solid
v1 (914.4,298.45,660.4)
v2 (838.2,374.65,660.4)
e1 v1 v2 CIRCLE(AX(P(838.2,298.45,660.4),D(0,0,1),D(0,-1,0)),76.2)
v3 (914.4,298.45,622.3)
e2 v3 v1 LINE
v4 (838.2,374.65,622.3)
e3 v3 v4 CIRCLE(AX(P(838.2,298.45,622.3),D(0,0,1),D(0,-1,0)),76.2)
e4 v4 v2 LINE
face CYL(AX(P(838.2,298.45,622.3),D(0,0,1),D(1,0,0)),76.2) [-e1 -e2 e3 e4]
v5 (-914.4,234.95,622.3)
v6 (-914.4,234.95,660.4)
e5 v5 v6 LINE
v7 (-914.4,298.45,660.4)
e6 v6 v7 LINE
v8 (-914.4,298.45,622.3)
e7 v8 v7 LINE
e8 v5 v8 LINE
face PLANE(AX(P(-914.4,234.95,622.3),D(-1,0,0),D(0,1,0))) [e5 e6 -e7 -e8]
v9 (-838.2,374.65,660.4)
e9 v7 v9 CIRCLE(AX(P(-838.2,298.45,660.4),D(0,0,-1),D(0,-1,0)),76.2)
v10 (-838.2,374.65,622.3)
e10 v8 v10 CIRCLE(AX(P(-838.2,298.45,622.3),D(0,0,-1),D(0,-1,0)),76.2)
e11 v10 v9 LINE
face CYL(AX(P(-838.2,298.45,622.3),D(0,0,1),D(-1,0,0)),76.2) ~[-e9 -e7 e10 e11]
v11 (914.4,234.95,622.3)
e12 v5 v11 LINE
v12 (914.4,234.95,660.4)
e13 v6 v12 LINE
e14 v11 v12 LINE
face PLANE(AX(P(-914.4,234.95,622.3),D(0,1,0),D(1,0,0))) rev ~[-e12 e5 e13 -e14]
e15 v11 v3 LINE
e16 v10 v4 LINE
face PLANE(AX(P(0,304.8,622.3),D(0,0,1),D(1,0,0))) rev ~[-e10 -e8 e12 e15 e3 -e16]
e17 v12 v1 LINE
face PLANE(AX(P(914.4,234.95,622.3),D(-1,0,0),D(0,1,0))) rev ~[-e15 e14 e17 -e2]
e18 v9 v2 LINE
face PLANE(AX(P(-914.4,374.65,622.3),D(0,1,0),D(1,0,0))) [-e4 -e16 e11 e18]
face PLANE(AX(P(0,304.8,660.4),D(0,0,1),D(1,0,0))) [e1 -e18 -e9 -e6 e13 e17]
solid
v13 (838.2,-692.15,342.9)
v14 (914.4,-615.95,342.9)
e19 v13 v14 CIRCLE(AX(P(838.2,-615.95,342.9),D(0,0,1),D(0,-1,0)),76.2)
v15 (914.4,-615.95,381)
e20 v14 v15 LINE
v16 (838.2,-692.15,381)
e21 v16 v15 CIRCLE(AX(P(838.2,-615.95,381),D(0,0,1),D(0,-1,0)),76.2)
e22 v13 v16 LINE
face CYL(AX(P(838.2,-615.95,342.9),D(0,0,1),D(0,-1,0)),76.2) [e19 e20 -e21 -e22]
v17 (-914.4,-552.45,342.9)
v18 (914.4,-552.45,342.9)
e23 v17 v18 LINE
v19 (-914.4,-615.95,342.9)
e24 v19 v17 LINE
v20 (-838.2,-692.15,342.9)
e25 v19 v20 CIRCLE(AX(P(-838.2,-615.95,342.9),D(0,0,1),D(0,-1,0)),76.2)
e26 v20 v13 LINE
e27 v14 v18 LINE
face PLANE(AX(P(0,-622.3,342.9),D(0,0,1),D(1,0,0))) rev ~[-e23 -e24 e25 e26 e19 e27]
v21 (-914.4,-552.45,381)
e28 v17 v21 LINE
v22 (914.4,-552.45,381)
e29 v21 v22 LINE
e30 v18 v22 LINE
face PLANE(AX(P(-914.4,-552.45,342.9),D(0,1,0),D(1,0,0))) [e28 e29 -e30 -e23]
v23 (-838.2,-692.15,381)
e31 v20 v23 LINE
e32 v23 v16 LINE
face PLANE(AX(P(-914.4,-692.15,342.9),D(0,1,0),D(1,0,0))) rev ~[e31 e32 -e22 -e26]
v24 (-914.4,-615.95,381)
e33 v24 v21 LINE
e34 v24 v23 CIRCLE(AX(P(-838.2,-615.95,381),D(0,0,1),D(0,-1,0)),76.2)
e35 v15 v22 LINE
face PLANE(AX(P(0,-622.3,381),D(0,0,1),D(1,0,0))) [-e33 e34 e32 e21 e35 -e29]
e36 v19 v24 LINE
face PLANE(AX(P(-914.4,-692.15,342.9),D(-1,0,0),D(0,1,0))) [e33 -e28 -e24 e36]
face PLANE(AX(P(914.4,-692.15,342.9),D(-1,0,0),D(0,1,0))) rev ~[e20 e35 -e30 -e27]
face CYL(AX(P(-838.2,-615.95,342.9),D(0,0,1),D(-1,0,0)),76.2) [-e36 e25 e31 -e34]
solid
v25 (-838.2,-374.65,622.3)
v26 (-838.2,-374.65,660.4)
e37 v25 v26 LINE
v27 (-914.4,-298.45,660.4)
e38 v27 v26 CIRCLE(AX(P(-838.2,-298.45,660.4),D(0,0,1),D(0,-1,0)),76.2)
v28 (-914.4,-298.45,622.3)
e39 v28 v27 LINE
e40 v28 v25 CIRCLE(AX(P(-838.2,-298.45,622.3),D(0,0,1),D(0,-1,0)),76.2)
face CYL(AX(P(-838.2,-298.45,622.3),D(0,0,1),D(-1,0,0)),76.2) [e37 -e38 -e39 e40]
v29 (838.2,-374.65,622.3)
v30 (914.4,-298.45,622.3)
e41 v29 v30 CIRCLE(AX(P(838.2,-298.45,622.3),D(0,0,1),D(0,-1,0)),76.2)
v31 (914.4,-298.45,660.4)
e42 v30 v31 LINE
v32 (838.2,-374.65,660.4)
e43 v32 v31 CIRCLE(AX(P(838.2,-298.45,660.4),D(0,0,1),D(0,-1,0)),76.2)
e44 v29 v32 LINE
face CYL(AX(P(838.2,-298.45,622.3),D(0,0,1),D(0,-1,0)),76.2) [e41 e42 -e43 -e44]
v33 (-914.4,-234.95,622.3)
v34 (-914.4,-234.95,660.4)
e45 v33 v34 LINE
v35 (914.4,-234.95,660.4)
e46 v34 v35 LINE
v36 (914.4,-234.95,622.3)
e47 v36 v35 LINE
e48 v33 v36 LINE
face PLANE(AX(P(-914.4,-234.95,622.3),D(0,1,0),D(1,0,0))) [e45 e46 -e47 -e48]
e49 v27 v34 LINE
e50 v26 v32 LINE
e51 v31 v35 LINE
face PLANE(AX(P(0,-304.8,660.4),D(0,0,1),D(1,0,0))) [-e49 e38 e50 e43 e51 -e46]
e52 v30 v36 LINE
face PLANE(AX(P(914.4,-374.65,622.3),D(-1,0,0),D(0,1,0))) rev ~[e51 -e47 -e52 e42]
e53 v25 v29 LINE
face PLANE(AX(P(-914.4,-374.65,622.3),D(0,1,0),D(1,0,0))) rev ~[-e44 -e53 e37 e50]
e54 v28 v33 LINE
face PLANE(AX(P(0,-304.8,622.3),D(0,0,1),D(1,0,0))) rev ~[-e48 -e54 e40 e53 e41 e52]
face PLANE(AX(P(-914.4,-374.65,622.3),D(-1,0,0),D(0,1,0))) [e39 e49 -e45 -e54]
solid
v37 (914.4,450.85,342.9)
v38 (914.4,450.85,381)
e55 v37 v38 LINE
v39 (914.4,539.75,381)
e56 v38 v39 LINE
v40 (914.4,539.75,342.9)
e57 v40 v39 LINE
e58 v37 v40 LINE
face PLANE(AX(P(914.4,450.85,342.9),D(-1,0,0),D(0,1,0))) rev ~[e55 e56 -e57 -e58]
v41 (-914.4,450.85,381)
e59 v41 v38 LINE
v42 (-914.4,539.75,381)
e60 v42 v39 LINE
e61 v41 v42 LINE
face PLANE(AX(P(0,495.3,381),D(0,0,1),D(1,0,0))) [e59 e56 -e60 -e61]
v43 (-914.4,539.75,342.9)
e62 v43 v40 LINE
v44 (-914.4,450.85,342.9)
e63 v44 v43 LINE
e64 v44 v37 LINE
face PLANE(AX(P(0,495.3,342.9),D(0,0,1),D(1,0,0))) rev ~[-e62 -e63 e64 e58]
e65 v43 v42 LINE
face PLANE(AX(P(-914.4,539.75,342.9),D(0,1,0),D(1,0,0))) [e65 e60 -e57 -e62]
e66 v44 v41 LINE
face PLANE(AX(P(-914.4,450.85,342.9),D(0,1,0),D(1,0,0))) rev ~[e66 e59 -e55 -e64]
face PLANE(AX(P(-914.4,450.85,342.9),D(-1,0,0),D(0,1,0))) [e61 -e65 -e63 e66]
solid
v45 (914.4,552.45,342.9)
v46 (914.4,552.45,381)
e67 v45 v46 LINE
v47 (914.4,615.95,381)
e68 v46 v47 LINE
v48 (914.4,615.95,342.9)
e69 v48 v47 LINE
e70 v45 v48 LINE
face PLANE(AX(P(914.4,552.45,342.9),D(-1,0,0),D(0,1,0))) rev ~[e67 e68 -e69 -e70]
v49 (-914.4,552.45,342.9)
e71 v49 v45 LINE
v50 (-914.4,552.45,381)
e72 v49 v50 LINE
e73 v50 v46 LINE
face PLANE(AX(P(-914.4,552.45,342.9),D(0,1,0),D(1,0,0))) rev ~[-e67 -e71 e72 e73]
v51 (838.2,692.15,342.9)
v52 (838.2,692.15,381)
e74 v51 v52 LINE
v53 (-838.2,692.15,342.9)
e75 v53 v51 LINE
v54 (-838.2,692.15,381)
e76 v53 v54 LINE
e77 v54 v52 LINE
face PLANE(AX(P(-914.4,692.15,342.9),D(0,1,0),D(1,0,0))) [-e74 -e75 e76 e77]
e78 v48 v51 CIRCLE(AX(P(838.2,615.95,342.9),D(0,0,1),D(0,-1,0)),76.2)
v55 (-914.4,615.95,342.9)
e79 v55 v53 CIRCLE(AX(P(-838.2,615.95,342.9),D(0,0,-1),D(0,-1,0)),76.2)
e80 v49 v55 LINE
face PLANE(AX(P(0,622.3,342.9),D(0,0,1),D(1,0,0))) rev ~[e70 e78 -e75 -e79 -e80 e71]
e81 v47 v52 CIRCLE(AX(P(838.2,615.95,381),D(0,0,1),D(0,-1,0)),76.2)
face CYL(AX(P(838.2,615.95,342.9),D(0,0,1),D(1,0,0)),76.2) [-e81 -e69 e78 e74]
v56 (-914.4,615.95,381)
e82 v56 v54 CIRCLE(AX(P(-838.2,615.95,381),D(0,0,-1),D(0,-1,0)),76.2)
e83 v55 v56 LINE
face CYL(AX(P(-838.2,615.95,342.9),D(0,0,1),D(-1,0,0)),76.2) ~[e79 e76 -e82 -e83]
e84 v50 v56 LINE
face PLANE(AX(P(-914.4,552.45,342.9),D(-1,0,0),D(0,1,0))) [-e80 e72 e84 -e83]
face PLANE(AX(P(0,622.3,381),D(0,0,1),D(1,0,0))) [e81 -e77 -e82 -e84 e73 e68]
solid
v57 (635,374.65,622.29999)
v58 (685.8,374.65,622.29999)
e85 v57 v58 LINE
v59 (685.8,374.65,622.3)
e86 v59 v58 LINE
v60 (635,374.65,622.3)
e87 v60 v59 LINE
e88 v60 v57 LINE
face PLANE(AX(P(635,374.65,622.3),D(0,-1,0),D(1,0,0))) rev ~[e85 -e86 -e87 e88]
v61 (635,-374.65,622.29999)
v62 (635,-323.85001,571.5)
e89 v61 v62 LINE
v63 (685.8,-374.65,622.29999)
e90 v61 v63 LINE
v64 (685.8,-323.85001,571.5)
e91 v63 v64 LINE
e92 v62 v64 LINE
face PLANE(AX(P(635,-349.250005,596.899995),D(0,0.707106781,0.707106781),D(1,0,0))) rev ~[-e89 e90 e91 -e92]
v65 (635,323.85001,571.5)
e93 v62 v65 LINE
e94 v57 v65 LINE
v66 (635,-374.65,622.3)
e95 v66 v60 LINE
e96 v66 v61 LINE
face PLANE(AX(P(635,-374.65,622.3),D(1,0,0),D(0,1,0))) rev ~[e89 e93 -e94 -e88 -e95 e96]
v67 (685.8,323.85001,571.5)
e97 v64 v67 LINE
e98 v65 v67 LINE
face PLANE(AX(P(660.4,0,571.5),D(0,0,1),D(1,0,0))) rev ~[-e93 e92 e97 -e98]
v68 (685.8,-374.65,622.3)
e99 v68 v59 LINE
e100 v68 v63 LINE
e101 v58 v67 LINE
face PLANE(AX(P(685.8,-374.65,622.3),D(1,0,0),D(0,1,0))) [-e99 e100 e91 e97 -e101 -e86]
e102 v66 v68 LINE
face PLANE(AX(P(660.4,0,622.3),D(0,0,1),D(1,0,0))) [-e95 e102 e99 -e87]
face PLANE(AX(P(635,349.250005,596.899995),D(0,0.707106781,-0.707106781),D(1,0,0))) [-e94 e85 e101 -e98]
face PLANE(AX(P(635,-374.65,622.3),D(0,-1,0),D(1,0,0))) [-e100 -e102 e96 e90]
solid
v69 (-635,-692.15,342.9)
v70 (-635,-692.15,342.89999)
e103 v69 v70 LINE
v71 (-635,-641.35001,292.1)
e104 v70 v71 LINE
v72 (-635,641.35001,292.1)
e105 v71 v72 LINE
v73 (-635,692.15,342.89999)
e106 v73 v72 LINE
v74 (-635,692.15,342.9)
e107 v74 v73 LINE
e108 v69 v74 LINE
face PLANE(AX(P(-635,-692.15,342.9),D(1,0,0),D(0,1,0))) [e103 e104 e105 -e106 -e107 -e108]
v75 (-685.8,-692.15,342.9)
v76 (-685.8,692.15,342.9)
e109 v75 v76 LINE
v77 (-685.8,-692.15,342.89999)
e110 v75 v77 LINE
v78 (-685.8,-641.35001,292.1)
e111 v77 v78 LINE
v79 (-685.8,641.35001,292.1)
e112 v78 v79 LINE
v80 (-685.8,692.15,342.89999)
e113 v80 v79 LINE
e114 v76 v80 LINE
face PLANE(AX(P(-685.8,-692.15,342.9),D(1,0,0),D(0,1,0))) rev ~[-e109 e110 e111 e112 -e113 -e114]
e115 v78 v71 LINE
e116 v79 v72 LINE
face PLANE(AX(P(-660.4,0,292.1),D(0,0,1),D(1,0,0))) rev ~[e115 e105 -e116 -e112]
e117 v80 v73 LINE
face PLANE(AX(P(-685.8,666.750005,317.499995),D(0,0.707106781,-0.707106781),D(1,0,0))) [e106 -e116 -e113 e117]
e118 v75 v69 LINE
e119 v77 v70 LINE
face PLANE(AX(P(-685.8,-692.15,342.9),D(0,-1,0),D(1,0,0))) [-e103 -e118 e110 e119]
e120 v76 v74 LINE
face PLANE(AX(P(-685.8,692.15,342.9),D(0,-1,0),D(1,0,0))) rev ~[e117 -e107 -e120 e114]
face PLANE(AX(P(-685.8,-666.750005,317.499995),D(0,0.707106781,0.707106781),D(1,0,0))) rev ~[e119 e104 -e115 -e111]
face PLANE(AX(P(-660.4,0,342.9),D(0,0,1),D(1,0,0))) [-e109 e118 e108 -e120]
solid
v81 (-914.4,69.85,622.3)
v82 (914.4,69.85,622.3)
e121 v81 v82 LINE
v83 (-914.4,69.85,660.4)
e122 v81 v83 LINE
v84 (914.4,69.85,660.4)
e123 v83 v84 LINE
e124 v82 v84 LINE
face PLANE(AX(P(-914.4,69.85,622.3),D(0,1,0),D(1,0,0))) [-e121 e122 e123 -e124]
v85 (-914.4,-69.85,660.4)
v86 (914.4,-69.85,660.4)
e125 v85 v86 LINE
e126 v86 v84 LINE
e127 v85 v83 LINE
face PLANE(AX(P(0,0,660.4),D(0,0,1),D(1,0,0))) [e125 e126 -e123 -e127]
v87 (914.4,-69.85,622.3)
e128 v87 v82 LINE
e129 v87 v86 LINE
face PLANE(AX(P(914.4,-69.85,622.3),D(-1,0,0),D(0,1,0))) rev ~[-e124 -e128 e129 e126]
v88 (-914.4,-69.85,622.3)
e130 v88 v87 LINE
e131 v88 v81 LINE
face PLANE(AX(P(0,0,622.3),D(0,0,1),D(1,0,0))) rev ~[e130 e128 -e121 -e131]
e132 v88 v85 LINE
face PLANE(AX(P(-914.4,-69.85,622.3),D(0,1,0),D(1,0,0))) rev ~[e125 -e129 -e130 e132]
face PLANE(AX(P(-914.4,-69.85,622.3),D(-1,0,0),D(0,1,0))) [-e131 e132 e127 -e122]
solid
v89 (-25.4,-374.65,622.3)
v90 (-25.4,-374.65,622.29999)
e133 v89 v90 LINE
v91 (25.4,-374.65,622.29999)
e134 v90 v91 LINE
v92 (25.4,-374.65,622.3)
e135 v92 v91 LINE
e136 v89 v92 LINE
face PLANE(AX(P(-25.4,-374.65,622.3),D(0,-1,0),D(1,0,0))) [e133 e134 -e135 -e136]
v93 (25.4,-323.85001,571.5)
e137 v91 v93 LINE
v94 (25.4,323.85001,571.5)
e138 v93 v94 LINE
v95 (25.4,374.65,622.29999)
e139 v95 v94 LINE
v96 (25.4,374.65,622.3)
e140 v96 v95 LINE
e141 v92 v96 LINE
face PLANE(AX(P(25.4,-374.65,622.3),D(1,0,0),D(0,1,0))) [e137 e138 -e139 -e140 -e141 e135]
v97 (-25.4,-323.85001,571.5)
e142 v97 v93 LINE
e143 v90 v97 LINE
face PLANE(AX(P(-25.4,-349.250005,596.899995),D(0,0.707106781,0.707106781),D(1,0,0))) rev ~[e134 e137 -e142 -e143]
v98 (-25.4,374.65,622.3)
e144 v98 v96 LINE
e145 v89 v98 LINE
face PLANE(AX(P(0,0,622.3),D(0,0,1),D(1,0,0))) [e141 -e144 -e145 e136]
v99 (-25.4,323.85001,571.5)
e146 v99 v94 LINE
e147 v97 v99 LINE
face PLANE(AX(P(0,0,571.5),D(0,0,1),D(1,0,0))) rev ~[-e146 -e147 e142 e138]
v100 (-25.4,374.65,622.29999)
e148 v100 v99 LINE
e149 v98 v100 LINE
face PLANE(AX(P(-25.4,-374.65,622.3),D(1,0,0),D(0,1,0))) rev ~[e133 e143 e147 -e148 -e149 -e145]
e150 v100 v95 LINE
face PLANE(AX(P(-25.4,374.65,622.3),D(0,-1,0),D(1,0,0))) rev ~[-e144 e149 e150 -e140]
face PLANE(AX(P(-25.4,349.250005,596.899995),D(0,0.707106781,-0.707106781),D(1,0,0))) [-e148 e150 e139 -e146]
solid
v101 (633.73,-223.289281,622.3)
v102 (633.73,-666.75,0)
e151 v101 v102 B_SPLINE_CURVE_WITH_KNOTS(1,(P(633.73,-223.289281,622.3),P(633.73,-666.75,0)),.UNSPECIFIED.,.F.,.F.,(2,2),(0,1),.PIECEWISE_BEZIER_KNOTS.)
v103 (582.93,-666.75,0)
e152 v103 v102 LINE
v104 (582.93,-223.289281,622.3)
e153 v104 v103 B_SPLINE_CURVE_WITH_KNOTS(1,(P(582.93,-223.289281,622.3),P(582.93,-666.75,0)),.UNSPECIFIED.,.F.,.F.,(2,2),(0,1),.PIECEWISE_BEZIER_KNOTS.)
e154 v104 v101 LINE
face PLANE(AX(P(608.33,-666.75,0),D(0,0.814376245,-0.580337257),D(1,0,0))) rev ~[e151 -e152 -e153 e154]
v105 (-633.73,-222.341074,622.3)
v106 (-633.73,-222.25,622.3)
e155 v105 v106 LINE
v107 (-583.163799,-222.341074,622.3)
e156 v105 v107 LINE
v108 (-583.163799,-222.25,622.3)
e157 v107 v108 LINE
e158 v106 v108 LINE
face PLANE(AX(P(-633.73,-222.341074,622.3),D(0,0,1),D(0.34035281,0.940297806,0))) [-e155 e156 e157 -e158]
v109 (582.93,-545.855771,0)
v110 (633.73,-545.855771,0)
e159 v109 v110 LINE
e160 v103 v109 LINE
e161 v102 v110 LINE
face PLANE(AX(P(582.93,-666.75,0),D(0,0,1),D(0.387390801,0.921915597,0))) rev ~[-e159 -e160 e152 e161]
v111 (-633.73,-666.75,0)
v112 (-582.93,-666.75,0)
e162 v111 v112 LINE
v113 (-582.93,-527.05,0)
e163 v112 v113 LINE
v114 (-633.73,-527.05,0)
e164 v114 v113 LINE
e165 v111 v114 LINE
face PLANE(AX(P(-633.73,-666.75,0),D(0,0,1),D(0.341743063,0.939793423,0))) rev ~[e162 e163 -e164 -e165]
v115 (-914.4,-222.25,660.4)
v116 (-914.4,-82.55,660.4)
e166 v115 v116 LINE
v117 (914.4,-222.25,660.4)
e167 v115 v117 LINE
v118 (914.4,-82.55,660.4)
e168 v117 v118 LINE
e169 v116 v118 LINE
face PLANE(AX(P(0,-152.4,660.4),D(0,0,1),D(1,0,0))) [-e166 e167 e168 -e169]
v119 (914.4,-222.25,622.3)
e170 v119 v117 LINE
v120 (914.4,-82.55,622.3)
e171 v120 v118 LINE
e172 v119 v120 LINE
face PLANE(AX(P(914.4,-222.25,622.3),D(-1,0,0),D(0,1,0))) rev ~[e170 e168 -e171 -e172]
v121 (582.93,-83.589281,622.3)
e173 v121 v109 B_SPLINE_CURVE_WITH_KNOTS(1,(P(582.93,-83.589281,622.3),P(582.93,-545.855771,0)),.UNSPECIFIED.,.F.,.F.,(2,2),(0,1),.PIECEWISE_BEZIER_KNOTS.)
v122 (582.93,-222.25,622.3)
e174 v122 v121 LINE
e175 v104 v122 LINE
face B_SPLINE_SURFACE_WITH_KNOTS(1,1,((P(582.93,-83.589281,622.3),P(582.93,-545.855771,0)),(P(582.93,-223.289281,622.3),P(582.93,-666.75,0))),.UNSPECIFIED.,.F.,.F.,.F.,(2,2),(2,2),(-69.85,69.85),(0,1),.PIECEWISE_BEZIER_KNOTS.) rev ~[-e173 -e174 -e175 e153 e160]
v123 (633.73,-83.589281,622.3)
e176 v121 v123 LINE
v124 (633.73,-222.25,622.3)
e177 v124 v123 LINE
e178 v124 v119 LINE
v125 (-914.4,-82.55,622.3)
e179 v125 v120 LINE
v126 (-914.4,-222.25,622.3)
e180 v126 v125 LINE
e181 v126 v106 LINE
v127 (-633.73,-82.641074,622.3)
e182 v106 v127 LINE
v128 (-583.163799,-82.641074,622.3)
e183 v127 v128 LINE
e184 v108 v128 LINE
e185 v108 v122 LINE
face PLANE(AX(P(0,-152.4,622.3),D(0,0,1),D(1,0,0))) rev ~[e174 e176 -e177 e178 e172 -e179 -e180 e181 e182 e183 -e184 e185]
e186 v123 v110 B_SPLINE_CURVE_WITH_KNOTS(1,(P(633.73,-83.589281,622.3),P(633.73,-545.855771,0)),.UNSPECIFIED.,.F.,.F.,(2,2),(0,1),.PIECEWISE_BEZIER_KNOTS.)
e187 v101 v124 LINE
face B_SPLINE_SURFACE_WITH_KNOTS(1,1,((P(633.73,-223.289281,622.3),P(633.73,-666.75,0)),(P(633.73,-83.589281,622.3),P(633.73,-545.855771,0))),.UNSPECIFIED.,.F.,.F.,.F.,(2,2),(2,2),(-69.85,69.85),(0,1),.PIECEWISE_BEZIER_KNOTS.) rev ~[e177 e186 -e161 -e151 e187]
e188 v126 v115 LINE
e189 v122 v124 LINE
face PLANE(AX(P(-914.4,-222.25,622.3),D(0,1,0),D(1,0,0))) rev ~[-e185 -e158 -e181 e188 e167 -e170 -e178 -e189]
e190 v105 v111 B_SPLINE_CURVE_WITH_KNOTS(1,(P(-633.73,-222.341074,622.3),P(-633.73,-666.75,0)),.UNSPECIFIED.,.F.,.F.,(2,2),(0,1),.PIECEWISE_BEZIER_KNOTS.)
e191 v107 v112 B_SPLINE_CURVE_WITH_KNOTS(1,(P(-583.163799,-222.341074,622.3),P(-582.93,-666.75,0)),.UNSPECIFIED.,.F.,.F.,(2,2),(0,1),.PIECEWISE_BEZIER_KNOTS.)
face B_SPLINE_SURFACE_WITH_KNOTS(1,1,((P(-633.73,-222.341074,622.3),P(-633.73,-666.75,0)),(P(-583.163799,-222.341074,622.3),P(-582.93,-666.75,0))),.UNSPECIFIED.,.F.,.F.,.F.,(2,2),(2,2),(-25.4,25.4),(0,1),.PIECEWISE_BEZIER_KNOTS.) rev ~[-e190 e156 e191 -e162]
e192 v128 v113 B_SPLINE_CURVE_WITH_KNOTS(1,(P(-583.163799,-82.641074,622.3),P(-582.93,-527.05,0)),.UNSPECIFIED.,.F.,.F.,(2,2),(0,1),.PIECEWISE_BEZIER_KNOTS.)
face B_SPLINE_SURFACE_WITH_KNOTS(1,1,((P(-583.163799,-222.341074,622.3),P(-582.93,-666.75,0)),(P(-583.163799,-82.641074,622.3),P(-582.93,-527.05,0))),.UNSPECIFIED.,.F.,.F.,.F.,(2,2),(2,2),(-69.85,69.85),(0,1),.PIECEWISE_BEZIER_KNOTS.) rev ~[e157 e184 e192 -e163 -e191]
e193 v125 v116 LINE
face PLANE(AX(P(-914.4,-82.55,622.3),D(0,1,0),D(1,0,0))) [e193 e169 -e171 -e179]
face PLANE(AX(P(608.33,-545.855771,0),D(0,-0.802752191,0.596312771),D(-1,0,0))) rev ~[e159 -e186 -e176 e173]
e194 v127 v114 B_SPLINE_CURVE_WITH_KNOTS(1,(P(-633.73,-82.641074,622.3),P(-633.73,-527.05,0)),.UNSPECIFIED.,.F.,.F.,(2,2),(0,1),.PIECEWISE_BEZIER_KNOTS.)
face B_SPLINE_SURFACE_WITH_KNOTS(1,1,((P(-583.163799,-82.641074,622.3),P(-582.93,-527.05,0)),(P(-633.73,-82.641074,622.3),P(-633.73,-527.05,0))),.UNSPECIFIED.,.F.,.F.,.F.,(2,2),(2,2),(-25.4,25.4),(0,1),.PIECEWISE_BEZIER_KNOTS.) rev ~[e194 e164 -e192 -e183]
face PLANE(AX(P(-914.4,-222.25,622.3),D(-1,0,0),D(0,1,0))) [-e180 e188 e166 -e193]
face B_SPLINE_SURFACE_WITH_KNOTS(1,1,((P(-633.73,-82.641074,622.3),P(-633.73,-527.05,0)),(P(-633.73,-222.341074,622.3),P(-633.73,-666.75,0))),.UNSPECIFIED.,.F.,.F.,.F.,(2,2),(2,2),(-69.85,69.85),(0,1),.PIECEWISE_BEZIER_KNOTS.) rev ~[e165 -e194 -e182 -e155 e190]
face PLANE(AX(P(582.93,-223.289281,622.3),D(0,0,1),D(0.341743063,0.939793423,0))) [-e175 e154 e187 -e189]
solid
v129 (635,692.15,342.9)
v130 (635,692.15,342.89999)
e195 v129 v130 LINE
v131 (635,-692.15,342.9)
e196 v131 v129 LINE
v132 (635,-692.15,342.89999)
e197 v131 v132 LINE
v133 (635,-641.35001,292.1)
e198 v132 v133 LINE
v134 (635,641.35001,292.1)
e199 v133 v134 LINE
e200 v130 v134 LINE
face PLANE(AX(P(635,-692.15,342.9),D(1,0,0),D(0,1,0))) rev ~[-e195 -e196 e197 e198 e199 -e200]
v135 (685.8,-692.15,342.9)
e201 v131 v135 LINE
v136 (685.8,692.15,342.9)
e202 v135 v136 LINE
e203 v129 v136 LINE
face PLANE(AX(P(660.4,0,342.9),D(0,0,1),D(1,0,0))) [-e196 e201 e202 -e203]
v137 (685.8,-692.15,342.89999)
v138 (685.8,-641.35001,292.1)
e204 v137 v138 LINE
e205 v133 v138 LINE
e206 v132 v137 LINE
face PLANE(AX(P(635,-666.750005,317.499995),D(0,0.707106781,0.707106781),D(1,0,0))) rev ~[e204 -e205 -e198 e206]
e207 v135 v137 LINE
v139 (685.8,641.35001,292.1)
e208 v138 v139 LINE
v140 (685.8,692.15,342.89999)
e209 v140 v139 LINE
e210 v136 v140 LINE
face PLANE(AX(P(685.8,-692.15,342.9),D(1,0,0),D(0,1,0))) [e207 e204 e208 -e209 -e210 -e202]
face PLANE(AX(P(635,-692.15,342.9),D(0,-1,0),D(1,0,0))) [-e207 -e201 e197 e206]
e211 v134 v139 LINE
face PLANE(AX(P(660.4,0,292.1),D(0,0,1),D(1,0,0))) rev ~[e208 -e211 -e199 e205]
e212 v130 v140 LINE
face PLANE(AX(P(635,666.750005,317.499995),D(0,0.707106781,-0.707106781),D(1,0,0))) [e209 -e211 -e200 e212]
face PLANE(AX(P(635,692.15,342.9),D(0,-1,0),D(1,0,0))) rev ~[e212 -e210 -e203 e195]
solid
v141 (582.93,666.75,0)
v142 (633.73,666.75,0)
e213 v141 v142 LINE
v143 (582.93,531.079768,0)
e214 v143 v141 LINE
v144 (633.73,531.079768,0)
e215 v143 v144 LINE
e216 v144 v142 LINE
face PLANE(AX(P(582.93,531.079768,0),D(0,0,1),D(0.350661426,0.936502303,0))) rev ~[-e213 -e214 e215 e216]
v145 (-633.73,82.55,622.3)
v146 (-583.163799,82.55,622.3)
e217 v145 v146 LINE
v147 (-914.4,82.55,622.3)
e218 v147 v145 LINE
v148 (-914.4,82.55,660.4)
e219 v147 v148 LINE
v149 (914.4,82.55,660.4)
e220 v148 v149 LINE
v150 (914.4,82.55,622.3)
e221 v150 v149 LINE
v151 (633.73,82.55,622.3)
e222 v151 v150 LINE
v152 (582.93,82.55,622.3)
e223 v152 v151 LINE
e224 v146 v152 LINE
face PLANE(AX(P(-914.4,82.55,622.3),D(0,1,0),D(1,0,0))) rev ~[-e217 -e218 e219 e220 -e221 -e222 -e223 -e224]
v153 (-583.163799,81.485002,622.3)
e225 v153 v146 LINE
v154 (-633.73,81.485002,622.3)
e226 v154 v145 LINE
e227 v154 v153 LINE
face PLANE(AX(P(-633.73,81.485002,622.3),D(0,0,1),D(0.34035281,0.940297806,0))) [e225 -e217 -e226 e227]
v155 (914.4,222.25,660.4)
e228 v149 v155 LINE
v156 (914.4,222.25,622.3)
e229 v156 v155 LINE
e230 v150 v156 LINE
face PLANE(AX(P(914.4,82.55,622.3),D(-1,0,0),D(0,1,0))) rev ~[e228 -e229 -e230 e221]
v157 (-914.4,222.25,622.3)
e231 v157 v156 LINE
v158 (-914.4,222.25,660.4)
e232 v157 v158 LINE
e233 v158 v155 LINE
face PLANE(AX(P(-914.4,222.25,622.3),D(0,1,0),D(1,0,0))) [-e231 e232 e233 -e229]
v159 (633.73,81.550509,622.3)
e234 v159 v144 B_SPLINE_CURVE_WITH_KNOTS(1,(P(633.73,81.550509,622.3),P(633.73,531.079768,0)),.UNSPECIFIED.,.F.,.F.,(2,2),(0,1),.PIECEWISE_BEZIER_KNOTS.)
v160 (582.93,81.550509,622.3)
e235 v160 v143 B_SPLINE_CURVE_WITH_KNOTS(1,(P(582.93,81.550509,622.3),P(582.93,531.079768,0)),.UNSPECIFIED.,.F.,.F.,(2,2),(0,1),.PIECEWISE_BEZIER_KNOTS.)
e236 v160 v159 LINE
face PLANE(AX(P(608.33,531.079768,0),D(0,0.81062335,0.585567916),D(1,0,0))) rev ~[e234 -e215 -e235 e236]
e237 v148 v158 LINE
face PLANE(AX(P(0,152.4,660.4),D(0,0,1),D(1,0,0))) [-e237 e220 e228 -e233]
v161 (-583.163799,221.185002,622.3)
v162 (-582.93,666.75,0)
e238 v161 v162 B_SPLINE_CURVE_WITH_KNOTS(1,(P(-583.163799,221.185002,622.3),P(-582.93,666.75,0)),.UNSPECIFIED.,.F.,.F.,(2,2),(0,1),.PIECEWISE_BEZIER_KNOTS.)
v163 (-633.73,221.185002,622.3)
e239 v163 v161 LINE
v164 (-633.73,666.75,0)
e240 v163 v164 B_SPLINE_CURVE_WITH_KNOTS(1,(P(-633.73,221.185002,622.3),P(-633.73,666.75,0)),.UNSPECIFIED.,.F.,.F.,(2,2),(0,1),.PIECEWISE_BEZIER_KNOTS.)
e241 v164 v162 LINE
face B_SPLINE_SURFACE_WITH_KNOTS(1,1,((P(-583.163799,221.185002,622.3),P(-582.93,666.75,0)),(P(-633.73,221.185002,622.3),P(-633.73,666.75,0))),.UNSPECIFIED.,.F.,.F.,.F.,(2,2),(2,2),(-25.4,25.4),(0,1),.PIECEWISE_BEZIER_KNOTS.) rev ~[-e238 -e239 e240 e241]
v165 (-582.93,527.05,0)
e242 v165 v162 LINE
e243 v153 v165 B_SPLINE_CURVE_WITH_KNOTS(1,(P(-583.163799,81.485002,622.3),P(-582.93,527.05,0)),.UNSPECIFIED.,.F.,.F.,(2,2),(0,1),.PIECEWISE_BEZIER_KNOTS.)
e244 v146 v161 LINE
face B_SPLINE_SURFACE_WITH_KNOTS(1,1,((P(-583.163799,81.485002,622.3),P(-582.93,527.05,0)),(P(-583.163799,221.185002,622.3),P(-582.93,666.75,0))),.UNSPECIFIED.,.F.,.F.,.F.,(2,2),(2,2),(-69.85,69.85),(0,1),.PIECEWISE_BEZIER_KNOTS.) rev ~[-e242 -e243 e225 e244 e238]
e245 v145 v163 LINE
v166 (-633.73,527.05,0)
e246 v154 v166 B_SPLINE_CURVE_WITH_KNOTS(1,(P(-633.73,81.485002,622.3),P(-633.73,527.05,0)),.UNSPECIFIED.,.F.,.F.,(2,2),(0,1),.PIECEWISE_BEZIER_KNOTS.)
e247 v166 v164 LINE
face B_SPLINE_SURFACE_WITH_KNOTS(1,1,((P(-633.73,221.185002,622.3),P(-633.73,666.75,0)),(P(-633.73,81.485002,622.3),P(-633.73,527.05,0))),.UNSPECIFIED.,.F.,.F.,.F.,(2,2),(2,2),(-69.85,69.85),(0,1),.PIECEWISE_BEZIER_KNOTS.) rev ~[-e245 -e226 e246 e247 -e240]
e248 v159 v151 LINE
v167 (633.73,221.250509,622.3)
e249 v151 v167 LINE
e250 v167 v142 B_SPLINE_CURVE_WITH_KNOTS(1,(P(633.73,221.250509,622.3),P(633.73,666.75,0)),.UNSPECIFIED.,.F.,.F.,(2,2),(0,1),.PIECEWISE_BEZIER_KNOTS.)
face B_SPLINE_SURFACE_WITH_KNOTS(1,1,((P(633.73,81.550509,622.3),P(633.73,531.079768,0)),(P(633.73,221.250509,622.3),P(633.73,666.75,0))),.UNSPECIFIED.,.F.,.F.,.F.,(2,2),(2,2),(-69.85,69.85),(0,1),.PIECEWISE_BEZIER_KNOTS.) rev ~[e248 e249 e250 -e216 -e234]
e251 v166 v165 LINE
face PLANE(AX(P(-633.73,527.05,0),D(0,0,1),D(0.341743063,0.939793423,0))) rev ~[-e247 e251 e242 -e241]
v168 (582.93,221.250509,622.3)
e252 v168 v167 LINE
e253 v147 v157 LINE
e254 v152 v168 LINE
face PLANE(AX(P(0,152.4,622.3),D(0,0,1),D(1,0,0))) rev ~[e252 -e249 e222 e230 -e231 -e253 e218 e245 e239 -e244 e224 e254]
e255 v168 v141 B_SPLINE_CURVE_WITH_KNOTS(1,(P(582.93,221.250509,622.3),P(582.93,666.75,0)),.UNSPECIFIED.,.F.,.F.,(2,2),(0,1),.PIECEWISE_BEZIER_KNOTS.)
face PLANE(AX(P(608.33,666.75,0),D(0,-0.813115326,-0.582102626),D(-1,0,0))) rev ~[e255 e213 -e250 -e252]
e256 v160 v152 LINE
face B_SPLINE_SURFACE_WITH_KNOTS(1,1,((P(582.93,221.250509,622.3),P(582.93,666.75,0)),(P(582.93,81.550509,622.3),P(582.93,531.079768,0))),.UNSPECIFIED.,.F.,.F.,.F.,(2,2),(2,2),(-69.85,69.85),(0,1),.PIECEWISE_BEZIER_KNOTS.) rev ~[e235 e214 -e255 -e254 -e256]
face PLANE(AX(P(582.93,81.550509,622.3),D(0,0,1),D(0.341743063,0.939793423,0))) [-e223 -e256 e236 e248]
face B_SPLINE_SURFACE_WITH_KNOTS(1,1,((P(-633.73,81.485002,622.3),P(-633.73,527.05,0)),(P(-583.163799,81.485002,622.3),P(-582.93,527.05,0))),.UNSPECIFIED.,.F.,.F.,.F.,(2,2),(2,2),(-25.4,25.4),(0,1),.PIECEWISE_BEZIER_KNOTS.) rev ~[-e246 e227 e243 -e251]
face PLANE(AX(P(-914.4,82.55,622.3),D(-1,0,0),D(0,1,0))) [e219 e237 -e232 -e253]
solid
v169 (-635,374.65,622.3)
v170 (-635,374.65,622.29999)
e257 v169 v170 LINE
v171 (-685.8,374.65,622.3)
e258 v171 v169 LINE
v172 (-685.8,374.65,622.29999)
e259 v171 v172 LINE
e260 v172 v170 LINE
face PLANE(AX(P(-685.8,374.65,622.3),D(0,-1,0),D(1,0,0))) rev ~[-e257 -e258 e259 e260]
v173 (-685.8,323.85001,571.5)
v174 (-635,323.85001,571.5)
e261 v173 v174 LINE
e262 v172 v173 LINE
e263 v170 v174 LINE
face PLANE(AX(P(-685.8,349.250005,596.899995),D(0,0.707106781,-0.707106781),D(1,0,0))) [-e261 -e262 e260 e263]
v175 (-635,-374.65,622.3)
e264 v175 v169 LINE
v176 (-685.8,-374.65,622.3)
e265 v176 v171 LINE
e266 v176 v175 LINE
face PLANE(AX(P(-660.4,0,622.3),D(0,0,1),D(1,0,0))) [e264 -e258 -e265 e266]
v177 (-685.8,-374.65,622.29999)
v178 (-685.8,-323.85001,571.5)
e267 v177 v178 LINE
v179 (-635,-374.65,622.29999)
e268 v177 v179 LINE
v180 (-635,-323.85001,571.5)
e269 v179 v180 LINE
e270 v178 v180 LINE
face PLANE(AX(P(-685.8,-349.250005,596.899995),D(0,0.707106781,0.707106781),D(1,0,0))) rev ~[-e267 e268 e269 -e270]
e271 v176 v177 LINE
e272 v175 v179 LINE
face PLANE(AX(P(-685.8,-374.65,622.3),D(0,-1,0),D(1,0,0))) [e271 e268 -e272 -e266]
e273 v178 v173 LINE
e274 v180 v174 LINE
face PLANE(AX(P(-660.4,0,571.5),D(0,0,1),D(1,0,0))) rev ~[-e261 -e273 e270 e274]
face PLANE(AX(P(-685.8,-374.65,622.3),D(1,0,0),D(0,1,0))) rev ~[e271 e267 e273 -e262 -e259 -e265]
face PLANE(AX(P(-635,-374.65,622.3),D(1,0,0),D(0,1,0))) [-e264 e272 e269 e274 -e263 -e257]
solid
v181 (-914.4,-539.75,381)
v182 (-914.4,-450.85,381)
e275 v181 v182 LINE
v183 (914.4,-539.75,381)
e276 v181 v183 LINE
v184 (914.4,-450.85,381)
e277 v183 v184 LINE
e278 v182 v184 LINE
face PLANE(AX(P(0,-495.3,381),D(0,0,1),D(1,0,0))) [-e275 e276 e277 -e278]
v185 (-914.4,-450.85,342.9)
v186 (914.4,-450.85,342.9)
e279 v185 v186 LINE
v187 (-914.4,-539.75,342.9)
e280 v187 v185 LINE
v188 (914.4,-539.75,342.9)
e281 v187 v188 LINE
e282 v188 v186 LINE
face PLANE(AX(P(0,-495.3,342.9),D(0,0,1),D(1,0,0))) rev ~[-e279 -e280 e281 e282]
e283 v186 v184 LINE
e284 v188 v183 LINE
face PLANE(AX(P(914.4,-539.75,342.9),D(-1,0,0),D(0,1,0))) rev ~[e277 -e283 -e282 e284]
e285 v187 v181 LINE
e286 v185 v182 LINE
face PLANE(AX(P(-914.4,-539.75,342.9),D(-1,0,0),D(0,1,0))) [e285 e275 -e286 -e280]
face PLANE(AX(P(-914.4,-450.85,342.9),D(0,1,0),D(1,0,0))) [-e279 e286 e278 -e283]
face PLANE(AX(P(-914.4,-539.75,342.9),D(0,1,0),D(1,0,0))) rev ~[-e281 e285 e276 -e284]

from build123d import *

# Parameters (mm, degrees)
F3_W       = 1828.8
F3_H       = 139.7
F4_DEPTH   = 38.1
F2_W       = 1828.8
F2_H       = 139.7
F5_R       = 76.2
F5_2_R     = 76.2
F6_W       = 1828.8
F6_H       = 88.9
F7_DEPTH   = 38.1
F6_H_2     = 139.7
F8_R       = 76.2
F8_2_R     = 76.2
F9_W       = 50.8
F9_H       = 749.3
F10_DEPTH  = 50.8
F12_SIZE   = 50.79999
F12_2_SIZE = 50.79999
F12_3_SIZE = 50.79999
F11_W      = 50.8
F11_H      = 1384.3
F13_DEPTH  = 50.8
F14_SIZE   = 50.79999
F14_2_SIZE = 50.79999
F15_W      = 50.8
F15_H      = 139.7
F16_W      = 50.8
F16_H      = 135.6702318695
F15_W_2    = 50.5662006634
F16_H_2    = 139.7
F16_H_3    = 120.8942294282


# Not quite as in the source:
# - a fillet or chamfer is up to 0.001 mm smaller than in the source, because OpenCascade refuses the exact size


with BuildPart() as f4:
    # F3 (on offset) → F4 (new body)
    with BuildSketch(Plane.XY.offset(622.3)):
        with Locations((0, 304.8)):
            Rectangle(F3_W, F3_H)
    extrude(amount=F4_DEPTH)

    # F5#2
    f5_2_edges = [f4.edges().sort_by_distance(p)[0] for p in [
        (914.4, 374.65, 641.35),
        (-914.4, 374.65, 641.35),
    ]]
    fillet(f5_2_edges, radius=F5_2_R)


with BuildPart() as f4b:
    # F3 (on offset) → F4, piece 2 (new body)
    with BuildSketch(Plane.XY.offset(622.3)):
        with Locations((0, 152.4)):
            Rectangle(F3_W, F3_H)
    extrude(amount=F4_DEPTH)

    # F15 (on offset) → F17 section 0
    with BuildSketch(Plane.XY.offset(622.3)):
        with Locations((608.33, 151.4005087376)):
            Rectangle(F15_W, F15_H)
    # F16 (on Top) → F17 section 1
    with BuildSketch(Plane.XY):
        with Locations((608.33, 598.9148840653)):
            Rectangle(F16_W, F16_H)
    loft()

    # F15 (on offset) → F18 section 0
    with BuildSketch(Plane.XY.offset(622.3)):
        with Locations((-608.4468996683, 151.3350016614)):
            Rectangle(F15_W_2, F15_H)
    # F16 (on Top) → F18 section 1
    with BuildSketch(Plane.XY):
        with Locations((-608.33, 596.9)):
            Rectangle(F16_W, F16_H_2)
    loft()


with BuildPart() as f4c:
    # F3 (on offset) → F4, piece 3 (new body)
    with BuildSketch(Plane.XY.offset(622.3)):
        with Locations((0, -152.4)):
            Rectangle(F3_W, F3_H)
    extrude(amount=F4_DEPTH)

    # F15 (on offset) → F19 section 0
    with BuildSketch(Plane.XY.offset(622.3)):
        with Locations((608.33, -153.4392811298)):
            Rectangle(F15_W, F15_H)
    # F16 (on Top) → F19 section 1
    with BuildSketch(Plane.XY):
        with Locations((608.33, -606.3028852859)):
            Rectangle(F16_W, F16_H_3)
    loft()

    # F15 (on offset) → F20 section 0
    with BuildSketch(Plane.XY.offset(622.3)):
        with Locations((-608.4468996683, -152.4910742103)):
            Rectangle(F15_W_2, F15_H)
    # F16 (on Top) → F20 section 1
    with BuildSketch(Plane.XY):
        with Locations((-608.33, -596.9)):
            Rectangle(F16_W, F16_H_2)
    loft()


with BuildPart() as f4d:
    # F3 (on offset) → F4, piece 4 (new body)
    with BuildSketch(Plane.XY.offset(622.3)):
        with Locations((0, -304.8)):
            Rectangle(F3_W, F3_H)
    extrude(amount=F4_DEPTH)

    # F5
    f5_edges = [f4d.edges().sort_by_distance(p)[0] for p in [
        (914.4, -374.65, 641.35),
        (-914.4, -374.65, 641.35),
    ]]
    fillet(f5_edges, radius=F5_R)


with BuildPart() as f4e:
    # F2 (on offset) → F4, piece 5 (new body)
    with BuildSketch(Plane.XY.offset(622.3)):
        Rectangle(F2_W, F2_H)
    extrude(amount=F4_DEPTH)


with BuildPart() as f7:
    # F6 (on offset) → F7 (new body)
    with BuildSketch(Plane.XY.offset(342.9)):
        with Locations((0, 495.3)):
            Rectangle(F6_W, F6_H)
    extrude(amount=F7_DEPTH)


with BuildPart() as f7b:
    # F6 (on offset) → F7, piece 2 (new body)
    with BuildSketch(Plane.XY.offset(342.9)):
        with Locations((0, -495.3)):
            Rectangle(F6_W, F6_H)
    extrude(amount=F7_DEPTH)


with BuildPart() as f7c:
    # F6 (on offset) → F7, piece 3 (new body)
    with BuildSketch(Plane.XY.offset(342.9)):
        with Locations((0, 622.3)):
            Rectangle(F6_W, F6_H_2)
    extrude(amount=F7_DEPTH)

    # F8#2
    f8_2_edges = [f7c.edges().sort_by_distance(p)[0] for p in [
        (-914.4, 692.15, 361.95),
        (914.4, 692.15, 361.95),
    ]]
    fillet(f8_2_edges, radius=F8_2_R)


with BuildPart() as f7d:
    # F6 (on offset) → F7, piece 4 (new body)
    with BuildSketch(Plane.XY.offset(342.9)):
        with Locations((0, -622.3)):
            Rectangle(F6_W, F6_H_2)
    extrude(amount=F7_DEPTH)

    # F8
    f8_edges = [f7d.edges().sort_by_distance(p)[0] for p in [
        (-914.4, -692.15, 361.95),
        (914.4, -692.15, 361.95),
    ]]
    fillet(f8_edges, radius=F8_R)


with BuildPart() as f10:
    # F9 (on offset) → F10 (new body)
    with BuildSketch(Plane.XY.offset(622.3)):
        with Locations((-660.4, 0)):
            Rectangle(F9_W, F9_H)
    extrude(amount=-F10_DEPTH)

    # F12 (size 50.8 in the source; OpenCascade refuses exactly that, so slightly less here)
    f12_edges = [f10.edges().sort_by_distance(p)[0] for p in [
        (-660.4, -374.65, 571.5),
        (-660.4, 374.65, 571.5),
    ]]
    chamfer(f12_edges, length=F12_SIZE)


with BuildPart() as f10b:
    # F9 (on offset) → F10, piece 2 (new body)
    with BuildSketch(Plane.XY.offset(622.3)):
        with Locations((660.4, 0)):
            Rectangle(F9_W, F9_H)
    extrude(amount=-F10_DEPTH)

    # F12#3 (size 50.8 in the source; OpenCascade refuses exactly that, so slightly less here)
    f12_3_edges = [f10b.edges().sort_by_distance(p)[0] for p in [
        (660.4, -374.65, 571.5),
        (660.4, 374.65, 571.5),
    ]]
    chamfer(f12_3_edges, length=F12_3_SIZE)


with BuildPart() as f10c:
    # F9 (on offset) → F10, piece 3 (new body)
    with BuildSketch(Plane.XY.offset(622.3)):
        Rectangle(F9_W, F9_H)
    extrude(amount=-F10_DEPTH)

    # F12#2 (size 50.8 in the source; OpenCascade refuses exactly that, so slightly less here)
    f12_2_edges = [f10c.edges().sort_by_distance(p)[0] for p in [
        (0, -374.65, 571.5),
        (0, 374.65, 571.5),
    ]]
    chamfer(f12_2_edges, length=F12_2_SIZE)


with BuildPart() as f13:
    # F11 (on offset) → F13 (new body)
    with BuildSketch(Plane.XY.offset(342.9)):
        with Locations((-660.4, 0)):
            Rectangle(F11_W, F11_H)
    extrude(amount=-F13_DEPTH)

    # F14 (size 50.8 in the source; OpenCascade refuses exactly that, so slightly less here)
    f14_edges = [f13.edges().sort_by_distance(p)[0] for p in [
        (-660.4, -692.15, 292.1),
        (-660.4, 692.15, 292.1),
    ]]
    chamfer(f14_edges, length=F14_SIZE)


with BuildPart() as f13b:
    # F11 (on offset) → F13, piece 2 (new body)
    with BuildSketch(Plane.XY.offset(342.9)):
        with Locations((660.4, 0)):
            Rectangle(F11_W, F11_H)
    extrude(amount=-F13_DEPTH)

    # F14#2 (size 50.8 in the source; OpenCascade refuses exactly that, so slightly less here)
    f14_2_edges = [f13b.edges().sort_by_distance(p)[0] for p in [
        (660.4, -692.15, 292.1),
        (660.4, 692.15, 292.1),
    ]]
    chamfer(f14_2_edges, length=F14_2_SIZE)


solid = Compound([f4.part, f4b.part, f4c.part, f4d.part, f4e.part, f7.part, f7b.part, f7c.part, f7d.part, f10.part, f10b.part, f10c.part, f13.part, f13b.part])
